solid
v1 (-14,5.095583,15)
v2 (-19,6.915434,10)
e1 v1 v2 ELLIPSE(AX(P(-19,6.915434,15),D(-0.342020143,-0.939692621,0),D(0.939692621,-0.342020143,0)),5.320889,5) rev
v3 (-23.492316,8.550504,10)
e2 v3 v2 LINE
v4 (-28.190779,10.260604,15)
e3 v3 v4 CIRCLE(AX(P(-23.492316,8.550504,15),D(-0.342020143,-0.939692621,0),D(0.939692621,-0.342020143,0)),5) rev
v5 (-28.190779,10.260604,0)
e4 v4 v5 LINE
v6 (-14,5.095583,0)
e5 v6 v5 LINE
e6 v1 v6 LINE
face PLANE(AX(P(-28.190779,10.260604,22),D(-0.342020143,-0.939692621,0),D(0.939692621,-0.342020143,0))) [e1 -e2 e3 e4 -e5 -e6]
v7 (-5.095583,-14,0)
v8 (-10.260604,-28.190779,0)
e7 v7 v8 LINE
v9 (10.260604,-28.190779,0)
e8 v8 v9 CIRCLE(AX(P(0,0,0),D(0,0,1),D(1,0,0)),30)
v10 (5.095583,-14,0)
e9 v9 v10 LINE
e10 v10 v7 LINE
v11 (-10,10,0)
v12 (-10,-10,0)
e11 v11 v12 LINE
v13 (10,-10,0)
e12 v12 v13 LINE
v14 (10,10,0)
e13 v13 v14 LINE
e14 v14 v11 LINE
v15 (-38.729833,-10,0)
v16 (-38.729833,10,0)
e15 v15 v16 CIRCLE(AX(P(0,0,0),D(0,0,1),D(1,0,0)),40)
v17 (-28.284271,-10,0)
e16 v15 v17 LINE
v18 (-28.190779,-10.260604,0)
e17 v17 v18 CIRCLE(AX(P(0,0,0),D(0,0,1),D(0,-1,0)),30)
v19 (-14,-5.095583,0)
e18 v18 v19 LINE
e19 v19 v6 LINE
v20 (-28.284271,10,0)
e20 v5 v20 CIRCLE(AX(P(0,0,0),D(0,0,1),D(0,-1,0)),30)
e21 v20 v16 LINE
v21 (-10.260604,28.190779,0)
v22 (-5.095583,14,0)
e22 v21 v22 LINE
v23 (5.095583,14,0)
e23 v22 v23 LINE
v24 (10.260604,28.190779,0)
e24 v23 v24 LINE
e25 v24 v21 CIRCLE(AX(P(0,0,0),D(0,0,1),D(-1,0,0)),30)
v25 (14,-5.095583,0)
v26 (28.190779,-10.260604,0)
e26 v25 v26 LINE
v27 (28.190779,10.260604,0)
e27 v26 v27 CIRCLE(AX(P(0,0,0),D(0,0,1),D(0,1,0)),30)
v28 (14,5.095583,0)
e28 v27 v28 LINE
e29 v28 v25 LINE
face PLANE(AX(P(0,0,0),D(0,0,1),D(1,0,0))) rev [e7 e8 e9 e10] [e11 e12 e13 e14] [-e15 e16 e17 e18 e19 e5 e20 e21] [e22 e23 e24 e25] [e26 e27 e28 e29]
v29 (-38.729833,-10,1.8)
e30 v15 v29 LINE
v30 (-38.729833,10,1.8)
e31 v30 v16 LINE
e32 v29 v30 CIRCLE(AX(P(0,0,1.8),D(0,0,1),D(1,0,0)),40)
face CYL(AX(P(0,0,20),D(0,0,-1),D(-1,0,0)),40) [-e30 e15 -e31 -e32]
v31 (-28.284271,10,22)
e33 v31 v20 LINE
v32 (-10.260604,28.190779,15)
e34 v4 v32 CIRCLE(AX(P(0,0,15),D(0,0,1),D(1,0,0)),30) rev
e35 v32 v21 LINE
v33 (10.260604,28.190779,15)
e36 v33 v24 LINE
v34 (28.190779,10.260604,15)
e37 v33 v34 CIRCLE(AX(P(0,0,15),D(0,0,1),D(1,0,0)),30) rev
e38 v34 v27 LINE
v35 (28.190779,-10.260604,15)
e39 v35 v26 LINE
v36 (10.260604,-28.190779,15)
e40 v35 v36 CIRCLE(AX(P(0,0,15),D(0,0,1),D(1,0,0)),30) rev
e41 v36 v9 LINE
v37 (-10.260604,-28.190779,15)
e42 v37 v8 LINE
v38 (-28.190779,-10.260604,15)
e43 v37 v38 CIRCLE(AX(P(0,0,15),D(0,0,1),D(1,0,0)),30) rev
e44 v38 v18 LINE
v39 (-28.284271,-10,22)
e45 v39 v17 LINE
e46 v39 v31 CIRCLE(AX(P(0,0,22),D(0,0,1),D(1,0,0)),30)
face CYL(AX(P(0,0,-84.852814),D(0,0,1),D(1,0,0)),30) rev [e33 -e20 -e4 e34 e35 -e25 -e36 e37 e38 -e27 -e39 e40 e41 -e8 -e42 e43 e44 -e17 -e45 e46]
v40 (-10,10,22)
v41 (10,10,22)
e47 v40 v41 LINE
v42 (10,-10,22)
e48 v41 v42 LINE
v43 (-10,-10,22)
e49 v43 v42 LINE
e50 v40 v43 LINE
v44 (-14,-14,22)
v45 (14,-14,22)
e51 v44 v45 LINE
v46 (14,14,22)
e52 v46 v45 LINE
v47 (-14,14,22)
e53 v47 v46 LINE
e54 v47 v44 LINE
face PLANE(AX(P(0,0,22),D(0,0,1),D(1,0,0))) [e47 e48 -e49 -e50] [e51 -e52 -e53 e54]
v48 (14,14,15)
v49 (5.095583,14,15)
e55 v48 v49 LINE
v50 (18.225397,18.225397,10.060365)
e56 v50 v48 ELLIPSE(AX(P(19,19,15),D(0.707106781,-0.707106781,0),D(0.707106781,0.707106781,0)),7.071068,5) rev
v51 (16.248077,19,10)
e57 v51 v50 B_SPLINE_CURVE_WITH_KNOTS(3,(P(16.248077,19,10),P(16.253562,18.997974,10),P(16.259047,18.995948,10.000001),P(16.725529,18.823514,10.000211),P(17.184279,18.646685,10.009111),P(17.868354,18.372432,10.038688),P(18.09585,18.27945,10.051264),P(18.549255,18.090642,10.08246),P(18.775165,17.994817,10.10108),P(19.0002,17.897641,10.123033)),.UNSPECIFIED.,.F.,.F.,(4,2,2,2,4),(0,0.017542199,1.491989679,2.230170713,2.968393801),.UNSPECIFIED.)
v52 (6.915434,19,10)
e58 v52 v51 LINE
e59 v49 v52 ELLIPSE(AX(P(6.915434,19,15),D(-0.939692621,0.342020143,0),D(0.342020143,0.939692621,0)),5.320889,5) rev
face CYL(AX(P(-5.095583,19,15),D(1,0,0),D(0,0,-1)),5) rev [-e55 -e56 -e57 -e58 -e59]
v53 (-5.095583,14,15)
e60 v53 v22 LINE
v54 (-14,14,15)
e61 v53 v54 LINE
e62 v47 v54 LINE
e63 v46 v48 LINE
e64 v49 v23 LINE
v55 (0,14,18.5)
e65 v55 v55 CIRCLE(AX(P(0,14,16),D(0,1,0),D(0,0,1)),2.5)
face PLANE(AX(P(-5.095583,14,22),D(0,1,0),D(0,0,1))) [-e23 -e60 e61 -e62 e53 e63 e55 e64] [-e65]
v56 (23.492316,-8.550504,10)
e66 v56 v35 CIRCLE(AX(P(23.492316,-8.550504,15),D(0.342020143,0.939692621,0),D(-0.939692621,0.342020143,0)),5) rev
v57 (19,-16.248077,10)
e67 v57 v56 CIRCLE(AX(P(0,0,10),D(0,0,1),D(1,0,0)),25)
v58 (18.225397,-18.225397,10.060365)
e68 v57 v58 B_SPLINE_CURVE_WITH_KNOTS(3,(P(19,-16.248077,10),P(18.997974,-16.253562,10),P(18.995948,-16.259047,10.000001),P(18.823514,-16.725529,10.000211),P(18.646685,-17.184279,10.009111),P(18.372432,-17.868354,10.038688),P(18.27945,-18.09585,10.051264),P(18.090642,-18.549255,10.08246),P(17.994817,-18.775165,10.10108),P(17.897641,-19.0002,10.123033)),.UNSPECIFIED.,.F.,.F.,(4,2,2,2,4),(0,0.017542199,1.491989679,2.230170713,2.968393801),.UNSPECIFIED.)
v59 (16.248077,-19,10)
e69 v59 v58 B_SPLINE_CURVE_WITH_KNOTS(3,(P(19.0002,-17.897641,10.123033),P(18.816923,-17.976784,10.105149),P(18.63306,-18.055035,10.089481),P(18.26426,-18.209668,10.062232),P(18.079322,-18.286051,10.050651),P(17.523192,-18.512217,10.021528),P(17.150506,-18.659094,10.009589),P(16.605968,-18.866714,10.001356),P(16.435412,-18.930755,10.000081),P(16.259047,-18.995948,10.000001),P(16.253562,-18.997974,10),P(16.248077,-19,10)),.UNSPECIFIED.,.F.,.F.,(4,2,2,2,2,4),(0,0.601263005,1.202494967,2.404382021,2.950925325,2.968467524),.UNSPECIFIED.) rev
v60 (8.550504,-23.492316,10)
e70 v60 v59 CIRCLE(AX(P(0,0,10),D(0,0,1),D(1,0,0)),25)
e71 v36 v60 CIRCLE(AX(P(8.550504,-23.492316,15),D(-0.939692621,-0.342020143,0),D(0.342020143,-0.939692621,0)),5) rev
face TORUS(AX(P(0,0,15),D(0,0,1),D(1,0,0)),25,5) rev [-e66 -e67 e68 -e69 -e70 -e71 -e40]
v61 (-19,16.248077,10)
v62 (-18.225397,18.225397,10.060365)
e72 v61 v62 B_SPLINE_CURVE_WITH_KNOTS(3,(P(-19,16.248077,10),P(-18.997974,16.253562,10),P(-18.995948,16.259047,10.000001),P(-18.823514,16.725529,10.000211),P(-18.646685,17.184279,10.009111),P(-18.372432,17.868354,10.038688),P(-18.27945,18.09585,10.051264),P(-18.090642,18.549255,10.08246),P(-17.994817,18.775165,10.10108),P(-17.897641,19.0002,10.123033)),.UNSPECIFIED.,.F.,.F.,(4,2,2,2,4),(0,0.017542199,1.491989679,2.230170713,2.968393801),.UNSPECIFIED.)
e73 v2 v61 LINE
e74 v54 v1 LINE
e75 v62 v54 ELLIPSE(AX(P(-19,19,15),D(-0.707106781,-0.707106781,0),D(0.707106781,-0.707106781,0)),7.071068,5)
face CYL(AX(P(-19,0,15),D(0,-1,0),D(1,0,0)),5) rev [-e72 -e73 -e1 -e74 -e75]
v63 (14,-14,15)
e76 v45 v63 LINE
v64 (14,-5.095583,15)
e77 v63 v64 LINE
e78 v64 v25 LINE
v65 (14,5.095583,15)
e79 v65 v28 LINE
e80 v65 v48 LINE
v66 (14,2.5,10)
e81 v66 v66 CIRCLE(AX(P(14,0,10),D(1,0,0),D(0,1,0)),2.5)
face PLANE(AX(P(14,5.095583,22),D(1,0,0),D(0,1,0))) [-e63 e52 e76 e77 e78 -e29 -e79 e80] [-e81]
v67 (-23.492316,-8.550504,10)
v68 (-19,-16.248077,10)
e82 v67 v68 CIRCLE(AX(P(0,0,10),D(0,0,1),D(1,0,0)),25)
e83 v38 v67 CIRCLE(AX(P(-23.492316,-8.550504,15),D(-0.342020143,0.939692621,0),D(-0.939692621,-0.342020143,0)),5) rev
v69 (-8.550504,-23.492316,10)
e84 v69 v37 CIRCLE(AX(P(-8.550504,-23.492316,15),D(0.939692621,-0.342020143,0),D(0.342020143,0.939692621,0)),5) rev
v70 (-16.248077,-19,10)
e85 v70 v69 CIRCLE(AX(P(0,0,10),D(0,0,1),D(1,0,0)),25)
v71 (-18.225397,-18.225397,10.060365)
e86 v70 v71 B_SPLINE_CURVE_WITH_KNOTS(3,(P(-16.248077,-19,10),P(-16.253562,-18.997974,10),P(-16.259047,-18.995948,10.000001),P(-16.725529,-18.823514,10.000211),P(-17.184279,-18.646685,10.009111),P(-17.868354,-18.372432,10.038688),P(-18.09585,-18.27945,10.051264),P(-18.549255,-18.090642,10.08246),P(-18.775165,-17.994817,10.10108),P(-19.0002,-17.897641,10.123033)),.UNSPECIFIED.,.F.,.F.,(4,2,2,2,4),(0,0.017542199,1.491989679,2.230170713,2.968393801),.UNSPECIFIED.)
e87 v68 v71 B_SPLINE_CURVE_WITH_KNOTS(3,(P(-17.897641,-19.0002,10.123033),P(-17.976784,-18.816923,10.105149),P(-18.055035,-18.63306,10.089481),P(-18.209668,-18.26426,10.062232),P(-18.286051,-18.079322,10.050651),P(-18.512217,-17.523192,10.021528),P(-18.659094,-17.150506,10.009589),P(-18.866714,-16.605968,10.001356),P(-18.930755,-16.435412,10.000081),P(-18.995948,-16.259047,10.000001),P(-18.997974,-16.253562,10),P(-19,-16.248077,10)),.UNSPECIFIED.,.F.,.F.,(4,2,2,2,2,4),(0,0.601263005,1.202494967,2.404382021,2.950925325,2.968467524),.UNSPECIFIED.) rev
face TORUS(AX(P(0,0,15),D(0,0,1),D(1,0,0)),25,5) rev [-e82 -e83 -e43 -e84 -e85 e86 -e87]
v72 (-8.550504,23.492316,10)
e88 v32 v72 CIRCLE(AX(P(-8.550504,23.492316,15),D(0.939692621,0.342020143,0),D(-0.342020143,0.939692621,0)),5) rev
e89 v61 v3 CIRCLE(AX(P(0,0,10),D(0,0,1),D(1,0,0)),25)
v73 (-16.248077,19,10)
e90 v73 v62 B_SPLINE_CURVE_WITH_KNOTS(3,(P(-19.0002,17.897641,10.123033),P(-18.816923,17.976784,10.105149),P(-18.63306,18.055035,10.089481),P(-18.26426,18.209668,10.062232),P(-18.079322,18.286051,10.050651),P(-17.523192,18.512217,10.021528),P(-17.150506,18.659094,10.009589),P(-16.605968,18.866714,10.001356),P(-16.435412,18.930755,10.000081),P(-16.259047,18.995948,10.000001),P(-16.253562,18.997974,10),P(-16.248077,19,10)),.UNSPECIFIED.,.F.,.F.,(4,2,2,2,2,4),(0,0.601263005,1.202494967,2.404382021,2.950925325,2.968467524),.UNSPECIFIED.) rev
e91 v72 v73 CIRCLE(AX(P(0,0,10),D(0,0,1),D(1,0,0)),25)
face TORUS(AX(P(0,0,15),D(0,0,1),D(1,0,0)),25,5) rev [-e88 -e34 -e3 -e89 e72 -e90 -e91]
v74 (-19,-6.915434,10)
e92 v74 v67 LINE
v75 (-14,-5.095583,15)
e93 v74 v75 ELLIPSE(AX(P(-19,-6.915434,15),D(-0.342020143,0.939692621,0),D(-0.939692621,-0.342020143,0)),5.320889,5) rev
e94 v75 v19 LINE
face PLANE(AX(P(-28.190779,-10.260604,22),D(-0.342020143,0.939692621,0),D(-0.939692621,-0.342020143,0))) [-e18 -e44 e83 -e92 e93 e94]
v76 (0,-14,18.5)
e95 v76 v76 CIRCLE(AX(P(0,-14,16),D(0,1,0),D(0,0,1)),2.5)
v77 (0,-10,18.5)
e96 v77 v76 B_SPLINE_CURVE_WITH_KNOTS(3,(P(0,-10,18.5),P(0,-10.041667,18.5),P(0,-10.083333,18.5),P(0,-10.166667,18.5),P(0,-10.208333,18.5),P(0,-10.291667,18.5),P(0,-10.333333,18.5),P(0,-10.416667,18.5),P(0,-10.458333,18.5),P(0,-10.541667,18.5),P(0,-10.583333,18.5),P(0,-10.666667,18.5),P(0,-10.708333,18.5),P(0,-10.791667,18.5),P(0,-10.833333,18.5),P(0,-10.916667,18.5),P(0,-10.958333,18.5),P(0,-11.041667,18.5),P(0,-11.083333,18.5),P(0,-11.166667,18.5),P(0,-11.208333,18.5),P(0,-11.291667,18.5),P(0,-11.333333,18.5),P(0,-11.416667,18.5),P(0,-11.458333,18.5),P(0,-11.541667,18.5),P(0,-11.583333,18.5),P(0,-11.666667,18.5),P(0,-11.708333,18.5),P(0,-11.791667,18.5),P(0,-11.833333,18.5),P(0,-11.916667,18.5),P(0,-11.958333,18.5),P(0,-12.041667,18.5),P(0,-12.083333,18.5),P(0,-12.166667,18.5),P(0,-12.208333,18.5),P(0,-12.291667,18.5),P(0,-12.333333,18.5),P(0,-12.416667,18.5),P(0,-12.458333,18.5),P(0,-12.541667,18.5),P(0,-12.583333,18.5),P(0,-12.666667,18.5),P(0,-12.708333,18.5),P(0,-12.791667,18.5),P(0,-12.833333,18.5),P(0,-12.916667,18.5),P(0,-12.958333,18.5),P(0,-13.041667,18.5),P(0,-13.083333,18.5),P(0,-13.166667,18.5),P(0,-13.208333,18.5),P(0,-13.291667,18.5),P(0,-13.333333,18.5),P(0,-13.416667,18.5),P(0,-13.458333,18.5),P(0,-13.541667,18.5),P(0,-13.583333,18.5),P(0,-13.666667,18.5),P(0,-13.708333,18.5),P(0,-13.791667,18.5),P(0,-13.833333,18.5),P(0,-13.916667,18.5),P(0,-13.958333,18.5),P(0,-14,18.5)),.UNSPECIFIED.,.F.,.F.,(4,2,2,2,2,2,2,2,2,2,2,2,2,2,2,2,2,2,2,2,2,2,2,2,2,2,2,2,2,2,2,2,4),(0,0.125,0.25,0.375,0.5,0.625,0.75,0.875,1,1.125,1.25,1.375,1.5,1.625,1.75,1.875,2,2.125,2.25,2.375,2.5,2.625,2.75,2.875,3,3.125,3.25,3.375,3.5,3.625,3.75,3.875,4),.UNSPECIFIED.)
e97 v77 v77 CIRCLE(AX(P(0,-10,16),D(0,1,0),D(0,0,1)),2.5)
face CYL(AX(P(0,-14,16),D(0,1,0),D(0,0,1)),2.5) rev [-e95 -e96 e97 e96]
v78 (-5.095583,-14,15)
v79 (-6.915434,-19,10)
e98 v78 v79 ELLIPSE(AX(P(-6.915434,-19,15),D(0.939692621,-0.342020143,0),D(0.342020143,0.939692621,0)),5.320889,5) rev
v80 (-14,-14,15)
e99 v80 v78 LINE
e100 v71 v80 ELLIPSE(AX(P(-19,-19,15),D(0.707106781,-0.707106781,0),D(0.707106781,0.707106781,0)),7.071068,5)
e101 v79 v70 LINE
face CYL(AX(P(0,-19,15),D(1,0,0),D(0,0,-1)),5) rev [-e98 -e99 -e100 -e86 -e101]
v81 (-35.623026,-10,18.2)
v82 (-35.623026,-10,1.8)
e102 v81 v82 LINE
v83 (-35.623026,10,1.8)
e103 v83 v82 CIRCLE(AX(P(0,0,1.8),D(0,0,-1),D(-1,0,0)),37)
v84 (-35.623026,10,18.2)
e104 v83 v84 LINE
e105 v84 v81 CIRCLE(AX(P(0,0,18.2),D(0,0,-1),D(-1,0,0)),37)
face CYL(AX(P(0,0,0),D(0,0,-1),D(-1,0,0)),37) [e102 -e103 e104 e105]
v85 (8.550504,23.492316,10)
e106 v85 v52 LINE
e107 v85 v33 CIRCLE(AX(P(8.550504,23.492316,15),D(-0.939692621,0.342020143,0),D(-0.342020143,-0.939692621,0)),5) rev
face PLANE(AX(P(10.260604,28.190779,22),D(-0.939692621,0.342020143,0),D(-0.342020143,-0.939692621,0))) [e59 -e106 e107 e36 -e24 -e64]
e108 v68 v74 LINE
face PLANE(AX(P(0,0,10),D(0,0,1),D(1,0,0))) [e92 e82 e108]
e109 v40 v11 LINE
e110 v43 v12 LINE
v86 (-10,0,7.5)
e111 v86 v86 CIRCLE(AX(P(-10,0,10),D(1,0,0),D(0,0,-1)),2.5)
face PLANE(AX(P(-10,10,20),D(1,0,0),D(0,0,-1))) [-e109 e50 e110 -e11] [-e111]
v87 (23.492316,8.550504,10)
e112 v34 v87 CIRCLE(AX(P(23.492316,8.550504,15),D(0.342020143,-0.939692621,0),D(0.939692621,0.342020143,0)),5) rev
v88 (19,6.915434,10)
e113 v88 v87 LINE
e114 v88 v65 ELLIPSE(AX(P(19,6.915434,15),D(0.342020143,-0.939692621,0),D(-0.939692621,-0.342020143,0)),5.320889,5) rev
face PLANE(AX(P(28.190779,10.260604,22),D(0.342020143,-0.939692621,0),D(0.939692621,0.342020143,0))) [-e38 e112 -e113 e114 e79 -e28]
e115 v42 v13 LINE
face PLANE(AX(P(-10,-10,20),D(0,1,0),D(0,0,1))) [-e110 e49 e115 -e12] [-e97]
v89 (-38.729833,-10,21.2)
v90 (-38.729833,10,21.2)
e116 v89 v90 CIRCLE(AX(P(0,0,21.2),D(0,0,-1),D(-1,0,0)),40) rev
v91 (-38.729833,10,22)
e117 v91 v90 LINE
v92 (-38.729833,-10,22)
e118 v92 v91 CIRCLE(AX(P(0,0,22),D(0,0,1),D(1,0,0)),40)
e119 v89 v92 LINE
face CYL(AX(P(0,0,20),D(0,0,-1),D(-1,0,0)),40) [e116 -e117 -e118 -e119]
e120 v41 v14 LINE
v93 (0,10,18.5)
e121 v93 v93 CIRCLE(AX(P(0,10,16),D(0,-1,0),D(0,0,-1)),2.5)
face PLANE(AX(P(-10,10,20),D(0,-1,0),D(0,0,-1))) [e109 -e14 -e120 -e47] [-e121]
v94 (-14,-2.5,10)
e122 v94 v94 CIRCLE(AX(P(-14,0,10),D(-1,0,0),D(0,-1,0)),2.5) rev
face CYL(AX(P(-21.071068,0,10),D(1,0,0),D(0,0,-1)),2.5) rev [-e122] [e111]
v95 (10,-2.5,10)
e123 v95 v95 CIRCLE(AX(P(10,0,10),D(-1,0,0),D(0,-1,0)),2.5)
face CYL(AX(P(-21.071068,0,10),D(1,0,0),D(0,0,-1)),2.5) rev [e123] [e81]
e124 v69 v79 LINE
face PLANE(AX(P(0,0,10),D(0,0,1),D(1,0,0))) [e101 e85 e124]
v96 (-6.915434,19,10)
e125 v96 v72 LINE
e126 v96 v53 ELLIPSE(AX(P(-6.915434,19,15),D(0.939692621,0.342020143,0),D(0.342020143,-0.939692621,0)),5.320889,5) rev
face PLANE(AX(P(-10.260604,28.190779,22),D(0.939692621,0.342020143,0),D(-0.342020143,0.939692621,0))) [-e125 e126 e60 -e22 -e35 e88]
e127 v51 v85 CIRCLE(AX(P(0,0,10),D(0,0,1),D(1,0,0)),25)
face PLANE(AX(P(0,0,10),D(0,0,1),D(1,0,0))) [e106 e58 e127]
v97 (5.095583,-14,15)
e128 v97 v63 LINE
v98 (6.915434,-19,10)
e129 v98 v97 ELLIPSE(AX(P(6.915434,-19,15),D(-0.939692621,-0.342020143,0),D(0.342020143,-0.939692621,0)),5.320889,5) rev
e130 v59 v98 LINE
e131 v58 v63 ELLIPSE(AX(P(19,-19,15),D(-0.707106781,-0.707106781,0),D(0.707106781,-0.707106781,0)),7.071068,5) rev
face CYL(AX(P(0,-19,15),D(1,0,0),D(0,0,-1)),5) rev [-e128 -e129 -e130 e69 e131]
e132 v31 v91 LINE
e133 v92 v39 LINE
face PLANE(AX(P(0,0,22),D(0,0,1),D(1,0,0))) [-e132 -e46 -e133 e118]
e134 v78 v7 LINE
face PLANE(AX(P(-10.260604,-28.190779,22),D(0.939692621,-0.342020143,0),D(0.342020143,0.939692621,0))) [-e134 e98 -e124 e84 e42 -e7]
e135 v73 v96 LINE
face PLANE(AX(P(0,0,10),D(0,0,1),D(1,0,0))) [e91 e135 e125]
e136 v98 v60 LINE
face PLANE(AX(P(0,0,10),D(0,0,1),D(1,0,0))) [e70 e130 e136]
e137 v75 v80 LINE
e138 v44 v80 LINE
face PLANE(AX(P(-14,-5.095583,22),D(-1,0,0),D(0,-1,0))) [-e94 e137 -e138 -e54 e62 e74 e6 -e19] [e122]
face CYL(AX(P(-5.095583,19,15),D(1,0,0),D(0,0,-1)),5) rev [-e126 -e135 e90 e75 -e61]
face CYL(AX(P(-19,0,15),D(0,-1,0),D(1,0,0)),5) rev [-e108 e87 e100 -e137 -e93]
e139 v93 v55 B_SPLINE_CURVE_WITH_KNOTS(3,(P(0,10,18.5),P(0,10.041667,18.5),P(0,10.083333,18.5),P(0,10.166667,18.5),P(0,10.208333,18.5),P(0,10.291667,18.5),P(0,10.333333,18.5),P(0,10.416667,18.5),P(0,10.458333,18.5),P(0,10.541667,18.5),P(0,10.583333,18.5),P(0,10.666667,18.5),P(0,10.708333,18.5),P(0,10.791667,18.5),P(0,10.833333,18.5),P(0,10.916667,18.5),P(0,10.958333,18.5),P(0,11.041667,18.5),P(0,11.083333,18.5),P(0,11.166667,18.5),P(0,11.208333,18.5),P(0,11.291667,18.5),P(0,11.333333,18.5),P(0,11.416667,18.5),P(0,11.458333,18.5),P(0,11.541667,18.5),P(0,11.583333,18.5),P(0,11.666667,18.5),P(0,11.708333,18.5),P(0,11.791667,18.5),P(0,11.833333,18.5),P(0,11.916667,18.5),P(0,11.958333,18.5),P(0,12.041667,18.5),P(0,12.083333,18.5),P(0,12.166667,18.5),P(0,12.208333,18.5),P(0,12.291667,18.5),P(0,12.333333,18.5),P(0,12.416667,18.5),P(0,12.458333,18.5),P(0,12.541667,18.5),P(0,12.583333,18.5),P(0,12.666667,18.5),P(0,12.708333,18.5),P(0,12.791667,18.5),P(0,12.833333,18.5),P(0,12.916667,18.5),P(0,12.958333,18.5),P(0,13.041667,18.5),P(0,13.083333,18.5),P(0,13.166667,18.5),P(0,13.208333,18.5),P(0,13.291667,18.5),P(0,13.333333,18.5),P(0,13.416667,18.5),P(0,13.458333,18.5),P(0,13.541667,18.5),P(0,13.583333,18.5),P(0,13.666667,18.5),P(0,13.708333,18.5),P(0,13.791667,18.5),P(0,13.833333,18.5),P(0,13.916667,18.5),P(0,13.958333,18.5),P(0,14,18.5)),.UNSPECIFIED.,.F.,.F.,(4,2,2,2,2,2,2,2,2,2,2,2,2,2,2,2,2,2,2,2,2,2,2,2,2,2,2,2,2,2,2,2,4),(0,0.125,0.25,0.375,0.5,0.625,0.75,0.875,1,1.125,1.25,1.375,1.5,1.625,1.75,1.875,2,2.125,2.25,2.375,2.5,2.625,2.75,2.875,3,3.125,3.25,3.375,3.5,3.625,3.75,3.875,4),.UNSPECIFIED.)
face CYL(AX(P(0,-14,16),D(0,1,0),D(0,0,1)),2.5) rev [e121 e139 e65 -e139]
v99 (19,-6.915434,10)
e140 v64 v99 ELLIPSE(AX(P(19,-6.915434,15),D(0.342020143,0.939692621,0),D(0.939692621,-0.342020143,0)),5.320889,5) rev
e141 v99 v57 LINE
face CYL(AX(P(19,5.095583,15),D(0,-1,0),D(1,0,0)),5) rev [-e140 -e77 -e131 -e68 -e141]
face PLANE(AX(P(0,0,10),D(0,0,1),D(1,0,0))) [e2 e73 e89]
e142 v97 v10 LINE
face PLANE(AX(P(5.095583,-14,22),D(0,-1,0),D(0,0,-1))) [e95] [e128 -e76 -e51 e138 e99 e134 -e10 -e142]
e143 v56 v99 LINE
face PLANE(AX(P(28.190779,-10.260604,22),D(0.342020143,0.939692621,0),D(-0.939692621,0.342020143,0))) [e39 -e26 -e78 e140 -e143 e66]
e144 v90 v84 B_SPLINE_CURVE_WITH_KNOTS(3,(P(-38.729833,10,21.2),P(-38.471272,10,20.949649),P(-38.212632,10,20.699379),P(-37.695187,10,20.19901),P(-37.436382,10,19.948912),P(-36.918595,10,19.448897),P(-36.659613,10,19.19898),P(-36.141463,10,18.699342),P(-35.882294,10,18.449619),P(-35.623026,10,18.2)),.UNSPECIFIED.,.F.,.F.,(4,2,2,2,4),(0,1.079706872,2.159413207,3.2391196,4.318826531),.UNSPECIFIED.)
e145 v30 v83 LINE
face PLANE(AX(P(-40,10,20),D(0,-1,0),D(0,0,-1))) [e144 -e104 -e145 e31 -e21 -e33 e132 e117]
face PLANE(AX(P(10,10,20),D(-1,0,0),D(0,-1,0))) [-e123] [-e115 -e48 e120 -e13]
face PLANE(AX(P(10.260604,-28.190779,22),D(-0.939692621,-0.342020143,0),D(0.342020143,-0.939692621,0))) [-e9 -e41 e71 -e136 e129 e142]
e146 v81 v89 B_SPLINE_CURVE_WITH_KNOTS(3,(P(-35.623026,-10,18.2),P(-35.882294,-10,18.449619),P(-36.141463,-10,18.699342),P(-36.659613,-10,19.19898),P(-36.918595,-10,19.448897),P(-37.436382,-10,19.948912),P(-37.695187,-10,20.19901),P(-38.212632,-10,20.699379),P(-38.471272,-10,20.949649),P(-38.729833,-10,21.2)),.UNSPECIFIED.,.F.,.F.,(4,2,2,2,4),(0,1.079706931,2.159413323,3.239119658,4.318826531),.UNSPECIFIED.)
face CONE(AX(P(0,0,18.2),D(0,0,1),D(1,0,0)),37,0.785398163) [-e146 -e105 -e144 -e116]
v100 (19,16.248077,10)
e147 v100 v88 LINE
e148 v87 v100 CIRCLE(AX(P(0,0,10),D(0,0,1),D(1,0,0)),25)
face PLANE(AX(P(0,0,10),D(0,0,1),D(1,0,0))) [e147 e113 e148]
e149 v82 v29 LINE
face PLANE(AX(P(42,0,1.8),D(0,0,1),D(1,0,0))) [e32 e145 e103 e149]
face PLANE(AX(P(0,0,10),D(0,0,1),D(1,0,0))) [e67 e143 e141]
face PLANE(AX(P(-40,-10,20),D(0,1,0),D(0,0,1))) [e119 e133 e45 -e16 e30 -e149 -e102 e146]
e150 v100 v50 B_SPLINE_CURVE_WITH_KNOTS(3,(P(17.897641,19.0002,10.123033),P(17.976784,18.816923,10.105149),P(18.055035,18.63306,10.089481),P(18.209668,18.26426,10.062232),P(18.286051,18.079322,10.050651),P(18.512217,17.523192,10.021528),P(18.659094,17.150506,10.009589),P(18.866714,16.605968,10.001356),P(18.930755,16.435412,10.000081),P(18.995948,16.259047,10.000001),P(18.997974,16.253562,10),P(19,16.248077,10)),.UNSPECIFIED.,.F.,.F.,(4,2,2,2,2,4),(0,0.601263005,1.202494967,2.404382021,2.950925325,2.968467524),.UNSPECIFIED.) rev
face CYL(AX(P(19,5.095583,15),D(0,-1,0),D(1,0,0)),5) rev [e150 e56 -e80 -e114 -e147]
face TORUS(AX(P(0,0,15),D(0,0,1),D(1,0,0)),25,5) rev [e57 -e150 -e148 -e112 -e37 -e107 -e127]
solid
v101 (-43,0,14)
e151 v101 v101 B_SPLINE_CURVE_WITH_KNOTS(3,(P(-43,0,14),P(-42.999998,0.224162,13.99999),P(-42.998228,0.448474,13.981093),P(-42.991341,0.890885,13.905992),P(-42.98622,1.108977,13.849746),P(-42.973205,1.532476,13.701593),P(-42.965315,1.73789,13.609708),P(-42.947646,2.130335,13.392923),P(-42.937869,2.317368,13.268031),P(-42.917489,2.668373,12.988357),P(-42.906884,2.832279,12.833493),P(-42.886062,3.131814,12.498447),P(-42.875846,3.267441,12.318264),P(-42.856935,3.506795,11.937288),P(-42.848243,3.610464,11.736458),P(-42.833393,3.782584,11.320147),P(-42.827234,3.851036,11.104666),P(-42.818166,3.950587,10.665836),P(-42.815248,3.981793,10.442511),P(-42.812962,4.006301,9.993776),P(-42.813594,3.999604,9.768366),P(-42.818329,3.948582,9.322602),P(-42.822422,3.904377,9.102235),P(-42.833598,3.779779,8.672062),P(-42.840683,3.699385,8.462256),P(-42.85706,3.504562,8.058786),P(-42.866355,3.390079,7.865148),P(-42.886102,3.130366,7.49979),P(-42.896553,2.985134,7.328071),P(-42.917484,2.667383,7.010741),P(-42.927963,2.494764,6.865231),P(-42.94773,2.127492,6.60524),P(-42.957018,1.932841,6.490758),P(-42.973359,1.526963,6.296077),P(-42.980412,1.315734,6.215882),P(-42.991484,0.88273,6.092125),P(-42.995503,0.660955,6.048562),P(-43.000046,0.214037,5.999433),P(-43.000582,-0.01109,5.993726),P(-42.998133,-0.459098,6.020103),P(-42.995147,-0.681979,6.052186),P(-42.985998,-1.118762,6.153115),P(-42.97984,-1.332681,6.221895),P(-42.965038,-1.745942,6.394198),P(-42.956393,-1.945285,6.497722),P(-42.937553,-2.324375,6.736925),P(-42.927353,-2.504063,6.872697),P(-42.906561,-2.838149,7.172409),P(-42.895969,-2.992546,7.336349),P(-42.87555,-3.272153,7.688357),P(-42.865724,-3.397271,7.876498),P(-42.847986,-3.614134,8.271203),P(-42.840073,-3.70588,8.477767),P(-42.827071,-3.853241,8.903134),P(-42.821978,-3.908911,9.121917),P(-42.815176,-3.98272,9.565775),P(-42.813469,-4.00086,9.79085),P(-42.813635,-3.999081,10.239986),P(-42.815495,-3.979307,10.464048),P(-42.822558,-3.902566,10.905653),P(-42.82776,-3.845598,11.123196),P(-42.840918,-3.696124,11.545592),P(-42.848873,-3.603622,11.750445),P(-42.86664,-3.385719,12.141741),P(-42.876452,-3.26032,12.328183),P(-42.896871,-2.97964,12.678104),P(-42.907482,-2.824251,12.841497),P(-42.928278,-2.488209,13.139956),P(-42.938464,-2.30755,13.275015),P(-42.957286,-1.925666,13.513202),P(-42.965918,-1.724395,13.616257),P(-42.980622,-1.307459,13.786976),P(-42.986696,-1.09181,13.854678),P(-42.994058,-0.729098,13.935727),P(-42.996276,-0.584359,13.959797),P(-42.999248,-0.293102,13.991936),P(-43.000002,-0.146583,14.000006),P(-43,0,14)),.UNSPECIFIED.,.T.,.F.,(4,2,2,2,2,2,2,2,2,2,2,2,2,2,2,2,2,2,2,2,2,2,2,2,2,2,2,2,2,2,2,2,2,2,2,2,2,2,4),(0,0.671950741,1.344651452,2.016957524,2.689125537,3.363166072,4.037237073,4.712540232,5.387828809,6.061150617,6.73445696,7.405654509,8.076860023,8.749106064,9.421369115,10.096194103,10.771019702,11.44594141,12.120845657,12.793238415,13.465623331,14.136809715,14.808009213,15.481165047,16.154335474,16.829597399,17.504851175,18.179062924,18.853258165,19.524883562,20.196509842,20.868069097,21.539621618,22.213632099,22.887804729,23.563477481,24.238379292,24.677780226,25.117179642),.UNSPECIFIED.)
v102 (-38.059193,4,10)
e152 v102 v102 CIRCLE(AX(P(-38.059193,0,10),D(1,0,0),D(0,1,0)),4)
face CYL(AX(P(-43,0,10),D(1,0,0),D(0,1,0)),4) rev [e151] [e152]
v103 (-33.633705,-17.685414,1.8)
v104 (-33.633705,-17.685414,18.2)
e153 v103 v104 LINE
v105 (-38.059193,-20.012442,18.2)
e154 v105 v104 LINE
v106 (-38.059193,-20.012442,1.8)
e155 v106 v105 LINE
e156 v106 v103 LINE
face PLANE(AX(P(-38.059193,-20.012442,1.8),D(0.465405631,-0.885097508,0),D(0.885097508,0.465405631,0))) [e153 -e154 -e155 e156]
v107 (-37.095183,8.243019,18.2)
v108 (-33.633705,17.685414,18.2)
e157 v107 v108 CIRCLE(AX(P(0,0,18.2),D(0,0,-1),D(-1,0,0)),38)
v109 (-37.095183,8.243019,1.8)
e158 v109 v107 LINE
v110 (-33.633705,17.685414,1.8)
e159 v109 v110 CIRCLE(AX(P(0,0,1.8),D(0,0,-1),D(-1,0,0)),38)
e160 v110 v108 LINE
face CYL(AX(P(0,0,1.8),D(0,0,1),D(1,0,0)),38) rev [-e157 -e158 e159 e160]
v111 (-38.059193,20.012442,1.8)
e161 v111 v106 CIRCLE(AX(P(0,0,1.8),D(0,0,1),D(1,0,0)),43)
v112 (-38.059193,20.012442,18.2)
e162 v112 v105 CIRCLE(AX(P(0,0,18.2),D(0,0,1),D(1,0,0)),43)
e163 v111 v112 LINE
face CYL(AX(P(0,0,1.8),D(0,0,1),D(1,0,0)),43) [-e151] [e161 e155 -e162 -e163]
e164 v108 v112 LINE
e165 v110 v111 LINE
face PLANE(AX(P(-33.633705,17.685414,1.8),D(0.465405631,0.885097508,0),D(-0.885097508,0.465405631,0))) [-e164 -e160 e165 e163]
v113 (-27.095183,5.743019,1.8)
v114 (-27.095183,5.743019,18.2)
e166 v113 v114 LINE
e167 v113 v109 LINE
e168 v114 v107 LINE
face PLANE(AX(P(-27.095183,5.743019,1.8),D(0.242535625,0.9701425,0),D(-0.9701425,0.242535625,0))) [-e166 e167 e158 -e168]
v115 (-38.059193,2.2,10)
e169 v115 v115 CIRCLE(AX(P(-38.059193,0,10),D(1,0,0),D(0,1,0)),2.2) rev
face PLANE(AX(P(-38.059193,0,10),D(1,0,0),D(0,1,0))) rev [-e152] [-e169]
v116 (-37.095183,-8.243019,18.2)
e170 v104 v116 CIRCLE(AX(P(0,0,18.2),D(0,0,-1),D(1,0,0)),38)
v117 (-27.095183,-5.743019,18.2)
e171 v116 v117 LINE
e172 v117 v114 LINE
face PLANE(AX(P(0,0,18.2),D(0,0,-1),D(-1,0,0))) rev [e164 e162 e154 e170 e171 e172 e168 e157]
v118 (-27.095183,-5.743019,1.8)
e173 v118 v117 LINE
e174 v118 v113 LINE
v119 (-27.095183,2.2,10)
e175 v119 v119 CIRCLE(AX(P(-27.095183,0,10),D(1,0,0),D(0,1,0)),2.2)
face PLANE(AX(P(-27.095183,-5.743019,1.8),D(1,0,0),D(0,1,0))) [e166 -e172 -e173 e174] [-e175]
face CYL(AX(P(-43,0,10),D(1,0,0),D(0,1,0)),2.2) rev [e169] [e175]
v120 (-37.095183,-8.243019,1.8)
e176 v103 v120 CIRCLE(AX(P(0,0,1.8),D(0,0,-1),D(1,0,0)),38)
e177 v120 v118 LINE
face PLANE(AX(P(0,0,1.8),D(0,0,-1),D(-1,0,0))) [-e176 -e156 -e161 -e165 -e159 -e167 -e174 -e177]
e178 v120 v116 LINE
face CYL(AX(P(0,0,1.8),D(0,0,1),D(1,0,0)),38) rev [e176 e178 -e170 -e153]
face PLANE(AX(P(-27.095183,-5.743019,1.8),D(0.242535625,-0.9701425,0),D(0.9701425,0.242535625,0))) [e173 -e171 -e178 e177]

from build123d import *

# Parameters (mm, degrees)
SKIZZE1_R                                    = 40
SKIZZE1_W                                    = 20
SKIZZE1_H                                    = 20
AUFSATZ_LINEAR_AUSTRAGEN1_DEPTH              = 20
SKIZZE2_R                                    = 30
SCHNITT_LINEAR_AUSTRAGEN1_DEPTH              = 10
SKIZZE4_W                                    = 5
SKIZZE4_H                                    = 16.4
SKIZZE5_W                                    = 11.715729
SKIZZE5_H                                    = 20
SCHNITT_LINEAR_AUSTRAGEN5_DEPTH              = 61
AUFSATZ_LINEAR_START                         = 18.2
AUFSATZ_LINEAR_AUSTRAGEN2_DEPTH              = 16.4
SKIZZE7_R                                    = 2.2
SCHNITT_LINEAR_AUSTRAGEN6_DEPTH              = 81.633514
SCHNITT_LINEAR_START                         = -10.964007
SKIZZE7_3_R                                  = 4
SCHNITT_LINEAR_AUSTRAGEN7_DEPTH              = 70.669507
FL_CHE_VERSCHIEBEN1_BY                       = 2
FASE2_SIZE                                   = 3
SCHNITT_LINEAR_AUSTRAGEN8_DEPTH              = 63.713635
KREISMUSTER1_COUNT                           = 4
SKIZZE1_2_W                                  = 28
SKIZZE1_2_H                                  = 28
SKIZZE1_2_W_2                                = 20
SKIZZE1_2_H_2                                = 20
LINEAR_AUSTRAGEN_D_NN1_DEPTH                 = 22
SCHNITT_LINEAR_AUSTRAGEN9_DEPTH              = 14
SCHNITT_LINEAR_AUSTRAGEN9_DEPTH_BACK         = 14
SKIZZE11_R                                   = 2.5
SCHNITT_LINEAR_AUSTRAGEN10_REACH             = 64.714
SKIZZE12_R                                   = 2.5
SCHNITT_LINEAR_AUSTRAGEN10_DIRECTION_2_REACH = 64.714
VERRUNDUNG2_R                                = 5


# Some blends are built 0.0001 mm under size
with BuildPart() as part:
    # Skizze1 → Aufsatz-Linear austragen1 (new body)
    with BuildSketch(Plane.XY):
        Circle(SKIZZE1_R)
        Rectangle(SKIZZE1_W, SKIZZE1_H, mode=Mode.SUBTRACT)
    extrude(amount=AUFSATZ_LINEAR_AUSTRAGEN1_DEPTH)

    # Skizze2 → Schnitt-Linear austragen1 (cut)
    with BuildSketch(Plane.XY.offset(20)):
        Circle(SKIZZE2_R)
    extrude(amount=-SCHNITT_LINEAR_AUSTRAGEN1_DEPTH, mode=Mode.SUBTRACT)

    # Skizze4 → Schnitt-Rotation1 (revolve, cut)
    with BuildSketch(Plane(origin=(0, 0, 0), x_dir=(1, 0, 0), z_dir=(0, 1, 0)), mode=Mode.PRIVATE) as schnitt_rotation1_sk:
        with Locations((39.5, -10)):
            Rectangle(SKIZZE4_W, SKIZZE4_H)
    revolve(schnitt_rotation1_sk.sketch.rotate(Axis((0, 0, 0), (0, 0, 1)), 180), axis=Axis((0, 0, 0), (0, 0, 1)), mode=Mode.SUBTRACT)

    # Skizze5 → Schnitt-Linear austragen5 (cut, through all)
    with BuildSketch(Plane.XY):
        with Locations((-34.142136, 0)):
            Rectangle(SKIZZE5_W, SKIZZE5_H)
    extrude(amount=SCHNITT_LINEAR_AUSTRAGEN5_DEPTH, mode=Mode.SUBTRACT)

    # Fläche verschieben1: a face moved outward by 2.0
    extrude(part.faces().sort_by_distance((0.635083, -32, 20))[0], amount=FL_CHE_VERSCHIEBEN1_BY, dir=(0, 0, 1))

    # Fase2
    fase2_edges = [part.edges().sort_by_distance(p)[0] for p in [
        (40, 0, 18.2),
    ]]
    chamfer(fase2_edges, length=FASE2_SIZE - 0.0001)  # a hair under: the kernel refuses the full size

    # Skizze10 → Schnitt-Linear austragen8 (cut, through all)
    with BuildSketch(Plane.XY):
        with BuildLine():
            Line((10.260604, 28.190779), (5.095583, 14))
            Line((5.095583, 14), (-5.095583, 14))
            Line((-5.095583, 14), (-10.260604, 28.190779))
            ThreePointArc((-10.260604, 28.190779), (0, 30), (10.260604, 28.190779))
        make_face()
    schnitt_linear_austragen8 = extrude(amount=SCHNITT_LINEAR_AUSTRAGEN8_DEPTH, mode=Mode.SUBTRACT)

    # Kreismuster1: Schnitt-Linear austragen8 ×4 about axis
    kreismuster1_axis = Axis((0, 0, 0), (0, 0, 1))
    for i in range(1, KREISMUSTER1_COUNT):
        add(schnitt_linear_austragen8.rotate(kreismuster1_axis, i * 360 / KREISMUSTER1_COUNT), mode=Mode.SUBTRACT)

    # Skizze1<2> → Linear-Austragen-Dünn1 (add)
    with BuildSketch(Plane.XY):
        Rectangle(SKIZZE1_2_W, SKIZZE1_2_H)
        Rectangle(SKIZZE1_2_W_2, SKIZZE1_2_H_2, mode=Mode.SUBTRACT)
    extrude(amount=LINEAR_AUSTRAGEN_D_NN1_DEPTH)

    # Skizze11 → Schnitt-Linear austragen9 (cut, two sides: drawn at the far end of the back side and taken through both)
    with BuildSketch(Plane(origin=(0, 0, 0), x_dir=(1, 0, 0), z_dir=(0, 1, 0)).offset(-SCHNITT_LINEAR_AUSTRAGEN9_DEPTH_BACK)):
        with Locations(Location((0, -16, 0), (0, 0, 270))):
            Circle(SKIZZE11_R)
    extrude(amount=SCHNITT_LINEAR_AUSTRAGEN9_DEPTH + SCHNITT_LINEAR_AUSTRAGEN9_DEPTH_BACK, mode=Mode.SUBTRACT)

    # Schnitt-Linear austragen10: up to this face of the body (flat: up to its plane)
    schnitt_linear_austragen10_end = Plane(part.part.faces().sort_by_distance((-14, 0, 13.440058))[0])
    # Skizze12 → Schnitt-Linear austragen10 (cut, up to the picked face)
    with BuildSketch(Plane(origin=(0, 0, 0), x_dir=(0, 0, -1), z_dir=(1, 0, 0)), mode=Mode.PRIVATE) as schnitt_linear_austragen10_sk1:
        with Locations(Location((-10, 0, 0), (0, 0, 90))):
            Circle(SKIZZE12_R)
    schnitt_linear_austragen10_tool1 = split(extrude(schnitt_linear_austragen10_sk1.sketch, amount=-SCHNITT_LINEAR_AUSTRAGEN10_REACH, mode=Mode.PRIVATE), bisect_by=schnitt_linear_austragen10_end, keep=Keep.BOTH, mode=Mode.PRIVATE)
    add(schnitt_linear_austragen10_tool1.solids().sort_by(Axis((0, 0, 10), (-1, 0, 0)))[0], mode=Mode.SUBTRACT)

    # Schnitt-Linear austragen10 direction 2: up to this face of the body (flat: up to its plane)
    schnitt_linear_austragen10_direction_2_end = Plane(part.part.faces().sort_by_distance((14, 0, 13.440058))[0])
    # Skizze12 → Schnitt-Linear austragen10 direction 2 (cut, up to the picked face)
    with BuildSketch(Plane(origin=(0, 0, 0), x_dir=(0, 0, -1), z_dir=(1, 0, 0)), mode=Mode.PRIVATE) as schnitt_linear_austragen10_direction_2_sk1:
        with Locations(Location((-10, 0, 0), (0, 0, 90))):
            Circle(SKIZZE12_R)
    schnitt_linear_austragen10_direction_2_tool1 = split(extrude(schnitt_linear_austragen10_direction_2_sk1.sketch, amount=SCHNITT_LINEAR_AUSTRAGEN10_DIRECTION_2_REACH, mode=Mode.PRIVATE), bisect_by=schnitt_linear_austragen10_direction_2_end, keep=Keep.BOTH, mode=Mode.PRIVATE)
    add(schnitt_linear_austragen10_direction_2_tool1.solids().sort_by(Axis((0, 0, 10), (1, 0, 0)))[0], mode=Mode.SUBTRACT)

    # Verrundung2
    # the kernel refuses this fillet: 5 mm, written as the material it adds along each edge
    with BuildSketch(Plane(origin=(0, 0, 10), x_dir=(-0.9396926207859098, 0.3420201433256648, 0), z_dir=(-0.3420201433256648, -0.9396926207859098, 0))) as verrundung2_piece_1:
        with BuildLine():
            CenterArc((30 - VERRUNDUNG2_R, -VERRUNDUNG2_R), VERRUNDUNG2_R, 0, 90)
            Line((30 - VERRUNDUNG2_R, 0), (30, 0))
            Line((30, 0), (30, -VERRUNDUNG2_R))
        make_face()
    revolve(axis=Axis((0, 0, 10), (0, 0, -1)), revolution_arc=50)
    with BuildSketch(Plane(origin=(0, 0, 10), x_dir=(0.9396926207859116, -0.34202014332565983, 0), z_dir=(0.34202014332565983, 0.9396926207859116, 0))) as verrundung2_piece_2:
        with BuildLine():
            CenterArc((30 - VERRUNDUNG2_R, -VERRUNDUNG2_R), VERRUNDUNG2_R, 0, 90)
            Line((30 - VERRUNDUNG2_R, 0), (30, 0))
            Line((30, 0), (30, -VERRUNDUNG2_R))
        make_face()
    revolve(axis=Axis((0, 0, 10), (0, 0, -1)), revolution_arc=50)
    with BuildSketch(Plane(origin=(0, 0, 10), x_dir=(-0.34202014332568725, -0.9396926207859017, 0), z_dir=(0.9396926207859017, -0.34202014332568725, 0))) as verrundung2_piece_3:
        with BuildLine():
            CenterArc((30 - VERRUNDUNG2_R, -VERRUNDUNG2_R), VERRUNDUNG2_R, 0, 90)
            Line((30 - VERRUNDUNG2_R, 0), (30, 0))
            Line((30, 0), (30, -VERRUNDUNG2_R))
        make_face()
    revolve(axis=Axis((0, 0, 10), (0, 0, -1)), revolution_arc=50)
    with BuildSketch(Plane(origin=(14, 14, 10), x_dir=(0, 1, 0), z_dir=(-1, 0, 0))) as verrundung2_piece_4_section:
        with BuildLine():
            CenterArc((VERRUNDUNG2_R, -VERRUNDUNG2_R), VERRUNDUNG2_R, 90, 90)
            Line((0, -VERRUNDUNG2_R), (0, 0))
            Line((0, 0), (VERRUNDUNG2_R, 0))
        make_face()
    verrundung2_piece_4 = extrude(amount=21.404417, mode=Mode.PRIVATE)
    verrundung2_piece_4 = split(verrundung2_piece_4, bisect_by=Plane(origin=(5.987236, 16.449795, 11.161394), z_dir=(0.9396926207859081, -0.3420201433256697, 0)), keep=Keep.TOP, mode=Mode.PRIVATE)
    add(verrundung2_piece_4)
    with BuildSketch(Plane(origin=(14, 14, 10), x_dir=(0, 1, 0), z_dir=(-1, 0, 0))) as verrundung2_piece_5_section:
        with BuildLine():
            CenterArc((VERRUNDUNG2_R, -VERRUNDUNG2_R), VERRUNDUNG2_R, 90, 90)
            Line((0, -VERRUNDUNG2_R), (0, 0))
            Line((0, 0), (VERRUNDUNG2_R, 0))
        make_face()
    verrundung2_piece_5 = extrude(amount=21.404417, mode=Mode.PRIVATE)
    verrundung2_piece_5 = split(verrundung2_piece_5, bisect_by=Plane(origin=(-5.54213, 15.226878, 11.263688), z_dir=(-0.9396926207859081, -0.3420201433256697, 0)), keep=Keep.TOP, mode=Mode.PRIVATE)
    add(verrundung2_piece_5)
    with BuildSketch(Plane(origin=(7.404417, 14, 10), x_dir=(0, 1, 0), z_dir=(-1, 0, 0))) as verrundung2_piece_6_section:
        with BuildLine():
            CenterArc((VERRUNDUNG2_R, -VERRUNDUNG2_R), VERRUNDUNG2_R, 90, 90)
            Line((0, -VERRUNDUNG2_R), (0, 0))
            Line((0, 0), (VERRUNDUNG2_R, 0))
        make_face()
    verrundung2_piece_6 = extrude(amount=21.404417, mode=Mode.PRIVATE)
    verrundung2_piece_6 = split(verrundung2_piece_6, bisect_by=Plane(origin=(5.54213, 15.226878, 11.263688), z_dir=(0.9396926207859081, -0.3420201433256697, 0)), keep=Keep.TOP, mode=Mode.PRIVATE)
    add(verrundung2_piece_6)
    with BuildSketch(Plane(origin=(7.404417, 14, 10), x_dir=(0, 1, 0), z_dir=(-1, 0, 0))) as verrundung2_piece_7_section:
        with BuildLine():
            CenterArc((VERRUNDUNG2_R, -VERRUNDUNG2_R), VERRUNDUNG2_R, 90, 90)
            Line((0, -VERRUNDUNG2_R), (0, 0))
            Line((0, 0), (VERRUNDUNG2_R, 0))
        make_face()
    verrundung2_piece_7 = extrude(amount=21.404417, mode=Mode.PRIVATE)
    verrundung2_piece_7 = split(verrundung2_piece_7, bisect_by=Plane(origin=(-5.987236, 16.449795, 11.161394), z_dir=(-0.9396926207859081, -0.3420201433256697, 0)), keep=Keep.TOP, mode=Mode.PRIVATE)
    add(verrundung2_piece_7)
    with BuildSketch(Plane(origin=(-14, 7.404417, 10), x_dir=(-1, 0, 0), z_dir=(0, -1, 0))) as verrundung2_piece_8_section:
        with BuildLine():
            CenterArc((VERRUNDUNG2_R, -VERRUNDUNG2_R), VERRUNDUNG2_R, 90, 90)
            Line((0, -VERRUNDUNG2_R), (0, 0))
            Line((0, 0), (VERRUNDUNG2_R, 0))
        make_face()
    verrundung2_piece_8 = extrude(amount=21.404417, mode=Mode.PRIVATE)
    verrundung2_piece_8 = split(verrundung2_piece_8, bisect_by=Plane(origin=(-15.226878, 5.54213, 11.263688), z_dir=(0.3420201433256698, 0.9396926207859081, 0)), keep=Keep.TOP, mode=Mode.PRIVATE)
    add(verrundung2_piece_8)
    with BuildSketch(Plane(origin=(-14, 7.404417, 10), x_dir=(-1, 0, 0), z_dir=(0, -1, 0))) as verrundung2_piece_9_section:
        with BuildLine():
            CenterArc((VERRUNDUNG2_R, -VERRUNDUNG2_R), VERRUNDUNG2_R, 90, 90)
            Line((0, -VERRUNDUNG2_R), (0, 0))
            Line((0, 0), (VERRUNDUNG2_R, 0))
        make_face()
    verrundung2_piece_9 = extrude(amount=21.404417, mode=Mode.PRIVATE)
    verrundung2_piece_9 = split(verrundung2_piece_9, bisect_by=Plane(origin=(-16.449795, -5.987236, 11.161394), z_dir=(0.3420201433256696, -0.9396926207859081, 0)), keep=Keep.TOP, mode=Mode.PRIVATE)
    add(verrundung2_piece_9)
    with BuildSketch(Plane(origin=(-14, 14, 10), x_dir=(-1, 0, 0), z_dir=(0, -1, 0))) as verrundung2_piece_10_section:
        with BuildLine():
            CenterArc((VERRUNDUNG2_R, -VERRUNDUNG2_R), VERRUNDUNG2_R, 90, 90)
            Line((0, -VERRUNDUNG2_R), (0, 0))
            Line((0, 0), (VERRUNDUNG2_R, 0))
        make_face()
    verrundung2_piece_10 = extrude(amount=21.404417, mode=Mode.PRIVATE)
    verrundung2_piece_10 = split(verrundung2_piece_10, bisect_by=Plane(origin=(-16.449795, 5.987236, 11.161394), z_dir=(0.3420201433256698, 0.9396926207859081, 0)), keep=Keep.TOP, mode=Mode.PRIVATE)
    add(verrundung2_piece_10)
    with BuildSketch(Plane(origin=(-14, 14, 10), x_dir=(-1, 0, 0), z_dir=(0, -1, 0))) as verrundung2_piece_11_section:
        with BuildLine():
            CenterArc((VERRUNDUNG2_R, -VERRUNDUNG2_R), VERRUNDUNG2_R, 90, 90)
            Line((0, -VERRUNDUNG2_R), (0, 0))
            Line((0, 0), (VERRUNDUNG2_R, 0))
        make_face()
    verrundung2_piece_11 = extrude(amount=21.404417, mode=Mode.PRIVATE)
    verrundung2_piece_11 = split(verrundung2_piece_11, bisect_by=Plane(origin=(-15.226878, -5.54213, 11.263688), z_dir=(0.3420201433256696, -0.9396926207859081, 0)), keep=Keep.TOP, mode=Mode.PRIVATE)
    add(verrundung2_piece_11)
    with BuildSketch(Plane(origin=(14, -14, 10), x_dir=(1, 0, 0), z_dir=(0, 1, 0))) as verrundung2_piece_12_section:
        with BuildLine():
            CenterArc((VERRUNDUNG2_R, -VERRUNDUNG2_R), VERRUNDUNG2_R, 90, 90)
            Line((0, -VERRUNDUNG2_R), (0, 0))
            Line((0, 0), (VERRUNDUNG2_R, 0))
        make_face()
    verrundung2_piece_12 = extrude(amount=21.404417, mode=Mode.PRIVATE)
    verrundung2_piece_12 = split(verrundung2_piece_12, bisect_by=Plane(origin=(16.449795, -5.987236, 11.161394), z_dir=(-0.34202014332566993, -0.939692620785908, 0)), keep=Keep.TOP, mode=Mode.PRIVATE)
    add(verrundung2_piece_12)
    with BuildSketch(Plane(origin=(14, -14, 10), x_dir=(1, 0, 0), z_dir=(0, 1, 0))) as verrundung2_piece_13_section:
        with BuildLine():
            CenterArc((VERRUNDUNG2_R, -VERRUNDUNG2_R), VERRUNDUNG2_R, 90, 90)
            Line((0, -VERRUNDUNG2_R), (0, 0))
            Line((0, 0), (VERRUNDUNG2_R, 0))
        make_face()
    verrundung2_piece_13 = extrude(amount=21.404417, mode=Mode.PRIVATE)
    verrundung2_piece_13 = split(verrundung2_piece_13, bisect_by=Plane(origin=(15.226878, 5.54213, 11.263688), z_dir=(-0.3420201433256695, 0.9396926207859082, 0)), keep=Keep.TOP, mode=Mode.PRIVATE)
    add(verrundung2_piece_13)
    with BuildSketch(Plane(origin=(14, -7.404417, 10), x_dir=(1, 0, 0), z_dir=(0, 1, 0))) as verrundung2_piece_14_section:
        with BuildLine():
            CenterArc((VERRUNDUNG2_R, -VERRUNDUNG2_R), VERRUNDUNG2_R, 90, 90)
            Line((0, -VERRUNDUNG2_R), (0, 0))
            Line((0, 0), (VERRUNDUNG2_R, 0))
        make_face()
    verrundung2_piece_14 = extrude(amount=21.404417, mode=Mode.PRIVATE)
    verrundung2_piece_14 = split(verrundung2_piece_14, bisect_by=Plane(origin=(15.226878, -5.54213, 11.263688), z_dir=(-0.34202014332566993, -0.939692620785908, 0)), keep=Keep.TOP, mode=Mode.PRIVATE)
    add(verrundung2_piece_14)
    with BuildSketch(Plane(origin=(14, -7.404417, 10), x_dir=(1, 0, 0), z_dir=(0, 1, 0))) as verrundung2_piece_15_section:
        with BuildLine():
            CenterArc((VERRUNDUNG2_R, -VERRUNDUNG2_R), VERRUNDUNG2_R, 90, 90)
            Line((0, -VERRUNDUNG2_R), (0, 0))
            Line((0, 0), (VERRUNDUNG2_R, 0))
        make_face()
    verrundung2_piece_15 = extrude(amount=21.404417, mode=Mode.PRIVATE)
    verrundung2_piece_15 = split(verrundung2_piece_15, bisect_by=Plane(origin=(16.449795, 5.987236, 11.161394), z_dir=(-0.3420201433256695, 0.9396926207859082, 0)), keep=Keep.TOP, mode=Mode.PRIVATE)
    add(verrundung2_piece_15)
    with BuildSketch(Plane(origin=(-7.404417, -14, 10), x_dir=(0, -1, 0), z_dir=(1, 0, 0))) as verrundung2_piece_16_section:
        with BuildLine():
            CenterArc((VERRUNDUNG2_R, -VERRUNDUNG2_R), VERRUNDUNG2_R, 90, 90)
            Line((0, -VERRUNDUNG2_R), (0, 0))
            Line((0, 0), (VERRUNDUNG2_R, 0))
        make_face()
    verrundung2_piece_16 = extrude(amount=21.404417, mode=Mode.PRIVATE)
    verrundung2_piece_16 = split(verrundung2_piece_16, bisect_by=Plane(origin=(-5.54213, -15.226878, 11.263688), z_dir=(-0.9396926207859081, 0.3420201433256698, 0)), keep=Keep.TOP, mode=Mode.PRIVATE)
    add(verrundung2_piece_16)
    with BuildSketch(Plane(origin=(-7.404417, -14, 10), x_dir=(0, -1, 0), z_dir=(1, 0, 0))) as verrundung2_piece_17_section:
        with BuildLine():
            CenterArc((VERRUNDUNG2_R, -VERRUNDUNG2_R), VERRUNDUNG2_R, 90, 90)
            Line((0, -VERRUNDUNG2_R), (0, 0))
            Line((0, 0), (VERRUNDUNG2_R, 0))
        make_face()
    verrundung2_piece_17 = extrude(amount=21.404417, mode=Mode.PRIVATE)
    verrundung2_piece_17 = split(verrundung2_piece_17, bisect_by=Plane(origin=(5.987236, -16.449795, 11.161394), z_dir=(0.9396926207859081, 0.3420201433256696, 0)), keep=Keep.TOP, mode=Mode.PRIVATE)
    add(verrundung2_piece_17)
    with BuildSketch(Plane(origin=(-14, -14, 10), x_dir=(0, -1, 0), z_dir=(1, 0, 0))) as verrundung2_piece_18_section:
        with BuildLine():
            CenterArc((VERRUNDUNG2_R, -VERRUNDUNG2_R), VERRUNDUNG2_R, 90, 90)
            Line((0, -VERRUNDUNG2_R), (0, 0))
            Line((0, 0), (VERRUNDUNG2_R, 0))
        make_face()
    verrundung2_piece_18 = extrude(amount=21.404417, mode=Mode.PRIVATE)
    verrundung2_piece_18 = split(verrundung2_piece_18, bisect_by=Plane(origin=(-5.987236, -16.449795, 11.161394), z_dir=(-0.9396926207859081, 0.3420201433256698, 0)), keep=Keep.TOP, mode=Mode.PRIVATE)
    add(verrundung2_piece_18)
    with BuildSketch(Plane(origin=(-14, -14, 10), x_dir=(0, -1, 0), z_dir=(1, 0, 0))) as verrundung2_piece_19_section:
        with BuildLine():
            CenterArc((VERRUNDUNG2_R, -VERRUNDUNG2_R), VERRUNDUNG2_R, 90, 90)
            Line((0, -VERRUNDUNG2_R), (0, 0))
            Line((0, 0), (VERRUNDUNG2_R, 0))
        make_face()
    verrundung2_piece_19 = extrude(amount=21.404417, mode=Mode.PRIVATE)
    verrundung2_piece_19 = split(verrundung2_piece_19, bisect_by=Plane(origin=(5.54213, -15.226878, 11.263688), z_dir=(0.9396926207859081, 0.3420201433256696, 0)), keep=Keep.TOP, mode=Mode.PRIVATE)
    add(verrundung2_piece_19)
    with BuildSketch(Plane(origin=(0, 0, 10), x_dir=(0.3420201433256675, 0.9396926207859089, 0), z_dir=(-0.9396926207859089, 0.3420201433256675, 0))) as verrundung2_piece_20:
        with BuildLine():
            CenterArc((30 - VERRUNDUNG2_R, -VERRUNDUNG2_R), VERRUNDUNG2_R, 0, 90)
            Line((30 - VERRUNDUNG2_R, 0), (30, 0))
            Line((30, 0), (30, -VERRUNDUNG2_R))
        make_face()
    revolve(axis=Axis((0, 0, 10), (0, 0, -1)), revolution_arc=50)
    with BuildSketch(Plane(origin=(14, -7.404417, 10), x_dir=(1, 0, 0), z_dir=(0, 1, 0))) as verrundung2_piece_21a_section:
        with BuildLine():
            CenterArc((VERRUNDUNG2_R, -VERRUNDUNG2_R), VERRUNDUNG2_R, 90, 90)
            Line((0, -VERRUNDUNG2_R), (0, 0))
            Line((0, 0), (VERRUNDUNG2_R, 0))
        make_face()
    verrundung2_piece_21a = extrude(amount=33.904417, mode=Mode.PRIVATE)
    verrundung2_piece_21a = split(verrundung2_piece_21a, bisect_by=Plane(origin=(15.131976, 14, 11.131976), z_dir=(0, 1, 0)), keep=Keep.TOP, mode=Mode.PRIVATE)
    with BuildSketch(Plane(origin=(26.5, 14, 10), x_dir=(0, 1, 0), z_dir=(-1, 0, 0))) as verrundung2_piece_21b_section:
        with BuildLine():
            CenterArc((VERRUNDUNG2_R, -VERRUNDUNG2_R), VERRUNDUNG2_R, 90, 90)
            Line((0, -VERRUNDUNG2_R), (0, 0))
            Line((0, 0), (VERRUNDUNG2_R, 0))
        make_face()
    verrundung2_piece_21b = extrude(amount=33.904417, mode=Mode.PRIVATE)
    verrundung2_piece_21b = split(verrundung2_piece_21b, bisect_by=Plane(origin=(14, 15.131976, 11.131976), z_dir=(1, 0, 0)), keep=Keep.TOP, mode=Mode.PRIVATE)
    verrundung2_piece_21 = verrundung2_piece_21a & verrundung2_piece_21b
    add(verrundung2_piece_21)
    with BuildSketch(Plane(origin=(7.404417, 14, 10), x_dir=(0, 1, 0), z_dir=(-1, 0, 0))) as verrundung2_piece_22a_section:
        with BuildLine():
            CenterArc((VERRUNDUNG2_R, -VERRUNDUNG2_R), VERRUNDUNG2_R, 90, 90)
            Line((0, -VERRUNDUNG2_R), (0, 0))
            Line((0, 0), (VERRUNDUNG2_R, 0))
        make_face()
    verrundung2_piece_22a = extrude(amount=33.904417, mode=Mode.PRIVATE)
    verrundung2_piece_22a = split(verrundung2_piece_22a, bisect_by=Plane(origin=(-14, 15.131976, 11.131976), z_dir=(-1, 0, 0)), keep=Keep.TOP, mode=Mode.PRIVATE)
    with BuildSketch(Plane(origin=(-14, 26.5, 10), x_dir=(-1, 0, 0), z_dir=(0, -1, 0))) as verrundung2_piece_22b_section:
        with BuildLine():
            CenterArc((VERRUNDUNG2_R, -VERRUNDUNG2_R), VERRUNDUNG2_R, 90, 90)
            Line((0, -VERRUNDUNG2_R), (0, 0))
            Line((0, 0), (VERRUNDUNG2_R, 0))
        make_face()
    verrundung2_piece_22b = extrude(amount=33.904417, mode=Mode.PRIVATE)
    verrundung2_piece_22b = split(verrundung2_piece_22b, bisect_by=Plane(origin=(-15.131976, 14, 11.131976), z_dir=(0, 1, 0)), keep=Keep.TOP, mode=Mode.PRIVATE)
    verrundung2_piece_22 = verrundung2_piece_22a & verrundung2_piece_22b
    add(verrundung2_piece_22)
    with BuildSketch(Plane(origin=(-14, 7.404417, 10), x_dir=(-1, 0, 0), z_dir=(0, -1, 0))) as verrundung2_piece_23a_section:
        with BuildLine():
            CenterArc((VERRUNDUNG2_R, -VERRUNDUNG2_R), VERRUNDUNG2_R, 90, 90)
            Line((0, -VERRUNDUNG2_R), (0, 0))
            Line((0, 0), (VERRUNDUNG2_R, 0))
        make_face()
    verrundung2_piece_23a = extrude(amount=33.904417, mode=Mode.PRIVATE)
    verrundung2_piece_23a = split(verrundung2_piece_23a, bisect_by=Plane(origin=(-15.131976, -14, 11.131976), z_dir=(0, -1, 0)), keep=Keep.TOP, mode=Mode.PRIVATE)
    with BuildSketch(Plane(origin=(-26.5, -14, 10), x_dir=(0, -1, 0), z_dir=(1, 0, 0))) as verrundung2_piece_23b_section:
        with BuildLine():
            CenterArc((VERRUNDUNG2_R, -VERRUNDUNG2_R), VERRUNDUNG2_R, 90, 90)
            Line((0, -VERRUNDUNG2_R), (0, 0))
            Line((0, 0), (VERRUNDUNG2_R, 0))
        make_face()
    verrundung2_piece_23b = extrude(amount=33.904417, mode=Mode.PRIVATE)
    verrundung2_piece_23b = split(verrundung2_piece_23b, bisect_by=Plane(origin=(-14, -15.131976, 11.131976), z_dir=(-1, 0, 0)), keep=Keep.TOP, mode=Mode.PRIVATE)
    verrundung2_piece_23 = verrundung2_piece_23a & verrundung2_piece_23b
    add(verrundung2_piece_23)
    with BuildSketch(Plane(origin=(-7.404417, -14, 10), x_dir=(0, -1, 0), z_dir=(1, 0, 0))) as verrundung2_piece_24a_section:
        with BuildLine():
            CenterArc((VERRUNDUNG2_R, -VERRUNDUNG2_R), VERRUNDUNG2_R, 90, 90)
            Line((0, -VERRUNDUNG2_R), (0, 0))
            Line((0, 0), (VERRUNDUNG2_R, 0))
        make_face()
    verrundung2_piece_24a = extrude(amount=33.904417, mode=Mode.PRIVATE)
    verrundung2_piece_24a = split(verrundung2_piece_24a, bisect_by=Plane(origin=(14, -15.131976, 11.131976), z_dir=(1, 0, 0)), keep=Keep.TOP, mode=Mode.PRIVATE)
    with BuildSketch(Plane(origin=(14, -26.5, 10), x_dir=(1, 0, 0), z_dir=(0, 1, 0))) as verrundung2_piece_24b_section:
        with BuildLine():
            CenterArc((VERRUNDUNG2_R, -VERRUNDUNG2_R), VERRUNDUNG2_R, 90, 90)
            Line((0, -VERRUNDUNG2_R), (0, 0))
            Line((0, 0), (VERRUNDUNG2_R, 0))
        make_face()
    verrundung2_piece_24b = extrude(amount=33.904417, mode=Mode.PRIVATE)
    verrundung2_piece_24b = split(verrundung2_piece_24b, bisect_by=Plane(origin=(15.131976, -14, 11.131976), z_dir=(0, -1, 0)), keep=Keep.TOP, mode=Mode.PRIVATE)
    verrundung2_piece_24 = verrundung2_piece_24a & verrundung2_piece_24b
    add(verrundung2_piece_24)


with BuildPart() as body_2:
    # Skizze6 → Aufsatz-Linear austragen2 (new body)
    with BuildSketch(Plane.XY.offset(AUFSATZ_LINEAR_START)):
        with BuildLine():
            Line((-27.095183, 5.743019), (-37.095183, 8.243019))
            ThreePointArc((-37.095183, 8.243019), (-35.678195, 13.079234), (-33.633705, 17.685414))
            Line((-33.633705, 17.685414), (-38.059193, 20.012442))
            ThreePointArc((-38.059193, 20.012442), (-43, 0), (-38.059193, -20.012442))
            Line((-38.059193, -20.012442), (-33.633705, -17.685414))
            ThreePointArc((-33.633705, -17.685414), (-35.678195, -13.079234), (-37.095183, -8.243019))
            Line((-37.095183, -8.243019), (-27.095183, -5.743019))
            Line((-27.095183, -5.743019), (-27.095183, 5.743019))
        make_face()
    extrude(amount=-AUFSATZ_LINEAR_AUSTRAGEN2_DEPTH)

    # Skizze7 → Schnitt-Linear austragen6 (cut, through all)
    with BuildSketch(Plane(origin=(-27.095183, 0, 0), x_dir=(0, 0, -1), z_dir=(1, 0, 0))):
        with Locations(Location((-10, 0, 0), (0, 0, 90))):
            Circle(SKIZZE7_R)
    extrude(amount=-SCHNITT_LINEAR_AUSTRAGEN6_DEPTH, mode=Mode.SUBTRACT)

    # Skizze7<3> → Schnitt-Linear austragen7 (cut, through all)
    with BuildSketch(Plane(origin=(-27.095183, 0, 0), x_dir=(0, 0, -1), z_dir=(1, 0, 0)).offset(SCHNITT_LINEAR_START)):
        with Locations(Location((-10, 0, 0), (0, 0, 90))):
            Circle(SKIZZE7_3_R)
    extrude(amount=-SCHNITT_LINEAR_AUSTRAGEN7_DEPTH, mode=Mode.SUBTRACT)


solid = Compound([part.part, body_2.part])
